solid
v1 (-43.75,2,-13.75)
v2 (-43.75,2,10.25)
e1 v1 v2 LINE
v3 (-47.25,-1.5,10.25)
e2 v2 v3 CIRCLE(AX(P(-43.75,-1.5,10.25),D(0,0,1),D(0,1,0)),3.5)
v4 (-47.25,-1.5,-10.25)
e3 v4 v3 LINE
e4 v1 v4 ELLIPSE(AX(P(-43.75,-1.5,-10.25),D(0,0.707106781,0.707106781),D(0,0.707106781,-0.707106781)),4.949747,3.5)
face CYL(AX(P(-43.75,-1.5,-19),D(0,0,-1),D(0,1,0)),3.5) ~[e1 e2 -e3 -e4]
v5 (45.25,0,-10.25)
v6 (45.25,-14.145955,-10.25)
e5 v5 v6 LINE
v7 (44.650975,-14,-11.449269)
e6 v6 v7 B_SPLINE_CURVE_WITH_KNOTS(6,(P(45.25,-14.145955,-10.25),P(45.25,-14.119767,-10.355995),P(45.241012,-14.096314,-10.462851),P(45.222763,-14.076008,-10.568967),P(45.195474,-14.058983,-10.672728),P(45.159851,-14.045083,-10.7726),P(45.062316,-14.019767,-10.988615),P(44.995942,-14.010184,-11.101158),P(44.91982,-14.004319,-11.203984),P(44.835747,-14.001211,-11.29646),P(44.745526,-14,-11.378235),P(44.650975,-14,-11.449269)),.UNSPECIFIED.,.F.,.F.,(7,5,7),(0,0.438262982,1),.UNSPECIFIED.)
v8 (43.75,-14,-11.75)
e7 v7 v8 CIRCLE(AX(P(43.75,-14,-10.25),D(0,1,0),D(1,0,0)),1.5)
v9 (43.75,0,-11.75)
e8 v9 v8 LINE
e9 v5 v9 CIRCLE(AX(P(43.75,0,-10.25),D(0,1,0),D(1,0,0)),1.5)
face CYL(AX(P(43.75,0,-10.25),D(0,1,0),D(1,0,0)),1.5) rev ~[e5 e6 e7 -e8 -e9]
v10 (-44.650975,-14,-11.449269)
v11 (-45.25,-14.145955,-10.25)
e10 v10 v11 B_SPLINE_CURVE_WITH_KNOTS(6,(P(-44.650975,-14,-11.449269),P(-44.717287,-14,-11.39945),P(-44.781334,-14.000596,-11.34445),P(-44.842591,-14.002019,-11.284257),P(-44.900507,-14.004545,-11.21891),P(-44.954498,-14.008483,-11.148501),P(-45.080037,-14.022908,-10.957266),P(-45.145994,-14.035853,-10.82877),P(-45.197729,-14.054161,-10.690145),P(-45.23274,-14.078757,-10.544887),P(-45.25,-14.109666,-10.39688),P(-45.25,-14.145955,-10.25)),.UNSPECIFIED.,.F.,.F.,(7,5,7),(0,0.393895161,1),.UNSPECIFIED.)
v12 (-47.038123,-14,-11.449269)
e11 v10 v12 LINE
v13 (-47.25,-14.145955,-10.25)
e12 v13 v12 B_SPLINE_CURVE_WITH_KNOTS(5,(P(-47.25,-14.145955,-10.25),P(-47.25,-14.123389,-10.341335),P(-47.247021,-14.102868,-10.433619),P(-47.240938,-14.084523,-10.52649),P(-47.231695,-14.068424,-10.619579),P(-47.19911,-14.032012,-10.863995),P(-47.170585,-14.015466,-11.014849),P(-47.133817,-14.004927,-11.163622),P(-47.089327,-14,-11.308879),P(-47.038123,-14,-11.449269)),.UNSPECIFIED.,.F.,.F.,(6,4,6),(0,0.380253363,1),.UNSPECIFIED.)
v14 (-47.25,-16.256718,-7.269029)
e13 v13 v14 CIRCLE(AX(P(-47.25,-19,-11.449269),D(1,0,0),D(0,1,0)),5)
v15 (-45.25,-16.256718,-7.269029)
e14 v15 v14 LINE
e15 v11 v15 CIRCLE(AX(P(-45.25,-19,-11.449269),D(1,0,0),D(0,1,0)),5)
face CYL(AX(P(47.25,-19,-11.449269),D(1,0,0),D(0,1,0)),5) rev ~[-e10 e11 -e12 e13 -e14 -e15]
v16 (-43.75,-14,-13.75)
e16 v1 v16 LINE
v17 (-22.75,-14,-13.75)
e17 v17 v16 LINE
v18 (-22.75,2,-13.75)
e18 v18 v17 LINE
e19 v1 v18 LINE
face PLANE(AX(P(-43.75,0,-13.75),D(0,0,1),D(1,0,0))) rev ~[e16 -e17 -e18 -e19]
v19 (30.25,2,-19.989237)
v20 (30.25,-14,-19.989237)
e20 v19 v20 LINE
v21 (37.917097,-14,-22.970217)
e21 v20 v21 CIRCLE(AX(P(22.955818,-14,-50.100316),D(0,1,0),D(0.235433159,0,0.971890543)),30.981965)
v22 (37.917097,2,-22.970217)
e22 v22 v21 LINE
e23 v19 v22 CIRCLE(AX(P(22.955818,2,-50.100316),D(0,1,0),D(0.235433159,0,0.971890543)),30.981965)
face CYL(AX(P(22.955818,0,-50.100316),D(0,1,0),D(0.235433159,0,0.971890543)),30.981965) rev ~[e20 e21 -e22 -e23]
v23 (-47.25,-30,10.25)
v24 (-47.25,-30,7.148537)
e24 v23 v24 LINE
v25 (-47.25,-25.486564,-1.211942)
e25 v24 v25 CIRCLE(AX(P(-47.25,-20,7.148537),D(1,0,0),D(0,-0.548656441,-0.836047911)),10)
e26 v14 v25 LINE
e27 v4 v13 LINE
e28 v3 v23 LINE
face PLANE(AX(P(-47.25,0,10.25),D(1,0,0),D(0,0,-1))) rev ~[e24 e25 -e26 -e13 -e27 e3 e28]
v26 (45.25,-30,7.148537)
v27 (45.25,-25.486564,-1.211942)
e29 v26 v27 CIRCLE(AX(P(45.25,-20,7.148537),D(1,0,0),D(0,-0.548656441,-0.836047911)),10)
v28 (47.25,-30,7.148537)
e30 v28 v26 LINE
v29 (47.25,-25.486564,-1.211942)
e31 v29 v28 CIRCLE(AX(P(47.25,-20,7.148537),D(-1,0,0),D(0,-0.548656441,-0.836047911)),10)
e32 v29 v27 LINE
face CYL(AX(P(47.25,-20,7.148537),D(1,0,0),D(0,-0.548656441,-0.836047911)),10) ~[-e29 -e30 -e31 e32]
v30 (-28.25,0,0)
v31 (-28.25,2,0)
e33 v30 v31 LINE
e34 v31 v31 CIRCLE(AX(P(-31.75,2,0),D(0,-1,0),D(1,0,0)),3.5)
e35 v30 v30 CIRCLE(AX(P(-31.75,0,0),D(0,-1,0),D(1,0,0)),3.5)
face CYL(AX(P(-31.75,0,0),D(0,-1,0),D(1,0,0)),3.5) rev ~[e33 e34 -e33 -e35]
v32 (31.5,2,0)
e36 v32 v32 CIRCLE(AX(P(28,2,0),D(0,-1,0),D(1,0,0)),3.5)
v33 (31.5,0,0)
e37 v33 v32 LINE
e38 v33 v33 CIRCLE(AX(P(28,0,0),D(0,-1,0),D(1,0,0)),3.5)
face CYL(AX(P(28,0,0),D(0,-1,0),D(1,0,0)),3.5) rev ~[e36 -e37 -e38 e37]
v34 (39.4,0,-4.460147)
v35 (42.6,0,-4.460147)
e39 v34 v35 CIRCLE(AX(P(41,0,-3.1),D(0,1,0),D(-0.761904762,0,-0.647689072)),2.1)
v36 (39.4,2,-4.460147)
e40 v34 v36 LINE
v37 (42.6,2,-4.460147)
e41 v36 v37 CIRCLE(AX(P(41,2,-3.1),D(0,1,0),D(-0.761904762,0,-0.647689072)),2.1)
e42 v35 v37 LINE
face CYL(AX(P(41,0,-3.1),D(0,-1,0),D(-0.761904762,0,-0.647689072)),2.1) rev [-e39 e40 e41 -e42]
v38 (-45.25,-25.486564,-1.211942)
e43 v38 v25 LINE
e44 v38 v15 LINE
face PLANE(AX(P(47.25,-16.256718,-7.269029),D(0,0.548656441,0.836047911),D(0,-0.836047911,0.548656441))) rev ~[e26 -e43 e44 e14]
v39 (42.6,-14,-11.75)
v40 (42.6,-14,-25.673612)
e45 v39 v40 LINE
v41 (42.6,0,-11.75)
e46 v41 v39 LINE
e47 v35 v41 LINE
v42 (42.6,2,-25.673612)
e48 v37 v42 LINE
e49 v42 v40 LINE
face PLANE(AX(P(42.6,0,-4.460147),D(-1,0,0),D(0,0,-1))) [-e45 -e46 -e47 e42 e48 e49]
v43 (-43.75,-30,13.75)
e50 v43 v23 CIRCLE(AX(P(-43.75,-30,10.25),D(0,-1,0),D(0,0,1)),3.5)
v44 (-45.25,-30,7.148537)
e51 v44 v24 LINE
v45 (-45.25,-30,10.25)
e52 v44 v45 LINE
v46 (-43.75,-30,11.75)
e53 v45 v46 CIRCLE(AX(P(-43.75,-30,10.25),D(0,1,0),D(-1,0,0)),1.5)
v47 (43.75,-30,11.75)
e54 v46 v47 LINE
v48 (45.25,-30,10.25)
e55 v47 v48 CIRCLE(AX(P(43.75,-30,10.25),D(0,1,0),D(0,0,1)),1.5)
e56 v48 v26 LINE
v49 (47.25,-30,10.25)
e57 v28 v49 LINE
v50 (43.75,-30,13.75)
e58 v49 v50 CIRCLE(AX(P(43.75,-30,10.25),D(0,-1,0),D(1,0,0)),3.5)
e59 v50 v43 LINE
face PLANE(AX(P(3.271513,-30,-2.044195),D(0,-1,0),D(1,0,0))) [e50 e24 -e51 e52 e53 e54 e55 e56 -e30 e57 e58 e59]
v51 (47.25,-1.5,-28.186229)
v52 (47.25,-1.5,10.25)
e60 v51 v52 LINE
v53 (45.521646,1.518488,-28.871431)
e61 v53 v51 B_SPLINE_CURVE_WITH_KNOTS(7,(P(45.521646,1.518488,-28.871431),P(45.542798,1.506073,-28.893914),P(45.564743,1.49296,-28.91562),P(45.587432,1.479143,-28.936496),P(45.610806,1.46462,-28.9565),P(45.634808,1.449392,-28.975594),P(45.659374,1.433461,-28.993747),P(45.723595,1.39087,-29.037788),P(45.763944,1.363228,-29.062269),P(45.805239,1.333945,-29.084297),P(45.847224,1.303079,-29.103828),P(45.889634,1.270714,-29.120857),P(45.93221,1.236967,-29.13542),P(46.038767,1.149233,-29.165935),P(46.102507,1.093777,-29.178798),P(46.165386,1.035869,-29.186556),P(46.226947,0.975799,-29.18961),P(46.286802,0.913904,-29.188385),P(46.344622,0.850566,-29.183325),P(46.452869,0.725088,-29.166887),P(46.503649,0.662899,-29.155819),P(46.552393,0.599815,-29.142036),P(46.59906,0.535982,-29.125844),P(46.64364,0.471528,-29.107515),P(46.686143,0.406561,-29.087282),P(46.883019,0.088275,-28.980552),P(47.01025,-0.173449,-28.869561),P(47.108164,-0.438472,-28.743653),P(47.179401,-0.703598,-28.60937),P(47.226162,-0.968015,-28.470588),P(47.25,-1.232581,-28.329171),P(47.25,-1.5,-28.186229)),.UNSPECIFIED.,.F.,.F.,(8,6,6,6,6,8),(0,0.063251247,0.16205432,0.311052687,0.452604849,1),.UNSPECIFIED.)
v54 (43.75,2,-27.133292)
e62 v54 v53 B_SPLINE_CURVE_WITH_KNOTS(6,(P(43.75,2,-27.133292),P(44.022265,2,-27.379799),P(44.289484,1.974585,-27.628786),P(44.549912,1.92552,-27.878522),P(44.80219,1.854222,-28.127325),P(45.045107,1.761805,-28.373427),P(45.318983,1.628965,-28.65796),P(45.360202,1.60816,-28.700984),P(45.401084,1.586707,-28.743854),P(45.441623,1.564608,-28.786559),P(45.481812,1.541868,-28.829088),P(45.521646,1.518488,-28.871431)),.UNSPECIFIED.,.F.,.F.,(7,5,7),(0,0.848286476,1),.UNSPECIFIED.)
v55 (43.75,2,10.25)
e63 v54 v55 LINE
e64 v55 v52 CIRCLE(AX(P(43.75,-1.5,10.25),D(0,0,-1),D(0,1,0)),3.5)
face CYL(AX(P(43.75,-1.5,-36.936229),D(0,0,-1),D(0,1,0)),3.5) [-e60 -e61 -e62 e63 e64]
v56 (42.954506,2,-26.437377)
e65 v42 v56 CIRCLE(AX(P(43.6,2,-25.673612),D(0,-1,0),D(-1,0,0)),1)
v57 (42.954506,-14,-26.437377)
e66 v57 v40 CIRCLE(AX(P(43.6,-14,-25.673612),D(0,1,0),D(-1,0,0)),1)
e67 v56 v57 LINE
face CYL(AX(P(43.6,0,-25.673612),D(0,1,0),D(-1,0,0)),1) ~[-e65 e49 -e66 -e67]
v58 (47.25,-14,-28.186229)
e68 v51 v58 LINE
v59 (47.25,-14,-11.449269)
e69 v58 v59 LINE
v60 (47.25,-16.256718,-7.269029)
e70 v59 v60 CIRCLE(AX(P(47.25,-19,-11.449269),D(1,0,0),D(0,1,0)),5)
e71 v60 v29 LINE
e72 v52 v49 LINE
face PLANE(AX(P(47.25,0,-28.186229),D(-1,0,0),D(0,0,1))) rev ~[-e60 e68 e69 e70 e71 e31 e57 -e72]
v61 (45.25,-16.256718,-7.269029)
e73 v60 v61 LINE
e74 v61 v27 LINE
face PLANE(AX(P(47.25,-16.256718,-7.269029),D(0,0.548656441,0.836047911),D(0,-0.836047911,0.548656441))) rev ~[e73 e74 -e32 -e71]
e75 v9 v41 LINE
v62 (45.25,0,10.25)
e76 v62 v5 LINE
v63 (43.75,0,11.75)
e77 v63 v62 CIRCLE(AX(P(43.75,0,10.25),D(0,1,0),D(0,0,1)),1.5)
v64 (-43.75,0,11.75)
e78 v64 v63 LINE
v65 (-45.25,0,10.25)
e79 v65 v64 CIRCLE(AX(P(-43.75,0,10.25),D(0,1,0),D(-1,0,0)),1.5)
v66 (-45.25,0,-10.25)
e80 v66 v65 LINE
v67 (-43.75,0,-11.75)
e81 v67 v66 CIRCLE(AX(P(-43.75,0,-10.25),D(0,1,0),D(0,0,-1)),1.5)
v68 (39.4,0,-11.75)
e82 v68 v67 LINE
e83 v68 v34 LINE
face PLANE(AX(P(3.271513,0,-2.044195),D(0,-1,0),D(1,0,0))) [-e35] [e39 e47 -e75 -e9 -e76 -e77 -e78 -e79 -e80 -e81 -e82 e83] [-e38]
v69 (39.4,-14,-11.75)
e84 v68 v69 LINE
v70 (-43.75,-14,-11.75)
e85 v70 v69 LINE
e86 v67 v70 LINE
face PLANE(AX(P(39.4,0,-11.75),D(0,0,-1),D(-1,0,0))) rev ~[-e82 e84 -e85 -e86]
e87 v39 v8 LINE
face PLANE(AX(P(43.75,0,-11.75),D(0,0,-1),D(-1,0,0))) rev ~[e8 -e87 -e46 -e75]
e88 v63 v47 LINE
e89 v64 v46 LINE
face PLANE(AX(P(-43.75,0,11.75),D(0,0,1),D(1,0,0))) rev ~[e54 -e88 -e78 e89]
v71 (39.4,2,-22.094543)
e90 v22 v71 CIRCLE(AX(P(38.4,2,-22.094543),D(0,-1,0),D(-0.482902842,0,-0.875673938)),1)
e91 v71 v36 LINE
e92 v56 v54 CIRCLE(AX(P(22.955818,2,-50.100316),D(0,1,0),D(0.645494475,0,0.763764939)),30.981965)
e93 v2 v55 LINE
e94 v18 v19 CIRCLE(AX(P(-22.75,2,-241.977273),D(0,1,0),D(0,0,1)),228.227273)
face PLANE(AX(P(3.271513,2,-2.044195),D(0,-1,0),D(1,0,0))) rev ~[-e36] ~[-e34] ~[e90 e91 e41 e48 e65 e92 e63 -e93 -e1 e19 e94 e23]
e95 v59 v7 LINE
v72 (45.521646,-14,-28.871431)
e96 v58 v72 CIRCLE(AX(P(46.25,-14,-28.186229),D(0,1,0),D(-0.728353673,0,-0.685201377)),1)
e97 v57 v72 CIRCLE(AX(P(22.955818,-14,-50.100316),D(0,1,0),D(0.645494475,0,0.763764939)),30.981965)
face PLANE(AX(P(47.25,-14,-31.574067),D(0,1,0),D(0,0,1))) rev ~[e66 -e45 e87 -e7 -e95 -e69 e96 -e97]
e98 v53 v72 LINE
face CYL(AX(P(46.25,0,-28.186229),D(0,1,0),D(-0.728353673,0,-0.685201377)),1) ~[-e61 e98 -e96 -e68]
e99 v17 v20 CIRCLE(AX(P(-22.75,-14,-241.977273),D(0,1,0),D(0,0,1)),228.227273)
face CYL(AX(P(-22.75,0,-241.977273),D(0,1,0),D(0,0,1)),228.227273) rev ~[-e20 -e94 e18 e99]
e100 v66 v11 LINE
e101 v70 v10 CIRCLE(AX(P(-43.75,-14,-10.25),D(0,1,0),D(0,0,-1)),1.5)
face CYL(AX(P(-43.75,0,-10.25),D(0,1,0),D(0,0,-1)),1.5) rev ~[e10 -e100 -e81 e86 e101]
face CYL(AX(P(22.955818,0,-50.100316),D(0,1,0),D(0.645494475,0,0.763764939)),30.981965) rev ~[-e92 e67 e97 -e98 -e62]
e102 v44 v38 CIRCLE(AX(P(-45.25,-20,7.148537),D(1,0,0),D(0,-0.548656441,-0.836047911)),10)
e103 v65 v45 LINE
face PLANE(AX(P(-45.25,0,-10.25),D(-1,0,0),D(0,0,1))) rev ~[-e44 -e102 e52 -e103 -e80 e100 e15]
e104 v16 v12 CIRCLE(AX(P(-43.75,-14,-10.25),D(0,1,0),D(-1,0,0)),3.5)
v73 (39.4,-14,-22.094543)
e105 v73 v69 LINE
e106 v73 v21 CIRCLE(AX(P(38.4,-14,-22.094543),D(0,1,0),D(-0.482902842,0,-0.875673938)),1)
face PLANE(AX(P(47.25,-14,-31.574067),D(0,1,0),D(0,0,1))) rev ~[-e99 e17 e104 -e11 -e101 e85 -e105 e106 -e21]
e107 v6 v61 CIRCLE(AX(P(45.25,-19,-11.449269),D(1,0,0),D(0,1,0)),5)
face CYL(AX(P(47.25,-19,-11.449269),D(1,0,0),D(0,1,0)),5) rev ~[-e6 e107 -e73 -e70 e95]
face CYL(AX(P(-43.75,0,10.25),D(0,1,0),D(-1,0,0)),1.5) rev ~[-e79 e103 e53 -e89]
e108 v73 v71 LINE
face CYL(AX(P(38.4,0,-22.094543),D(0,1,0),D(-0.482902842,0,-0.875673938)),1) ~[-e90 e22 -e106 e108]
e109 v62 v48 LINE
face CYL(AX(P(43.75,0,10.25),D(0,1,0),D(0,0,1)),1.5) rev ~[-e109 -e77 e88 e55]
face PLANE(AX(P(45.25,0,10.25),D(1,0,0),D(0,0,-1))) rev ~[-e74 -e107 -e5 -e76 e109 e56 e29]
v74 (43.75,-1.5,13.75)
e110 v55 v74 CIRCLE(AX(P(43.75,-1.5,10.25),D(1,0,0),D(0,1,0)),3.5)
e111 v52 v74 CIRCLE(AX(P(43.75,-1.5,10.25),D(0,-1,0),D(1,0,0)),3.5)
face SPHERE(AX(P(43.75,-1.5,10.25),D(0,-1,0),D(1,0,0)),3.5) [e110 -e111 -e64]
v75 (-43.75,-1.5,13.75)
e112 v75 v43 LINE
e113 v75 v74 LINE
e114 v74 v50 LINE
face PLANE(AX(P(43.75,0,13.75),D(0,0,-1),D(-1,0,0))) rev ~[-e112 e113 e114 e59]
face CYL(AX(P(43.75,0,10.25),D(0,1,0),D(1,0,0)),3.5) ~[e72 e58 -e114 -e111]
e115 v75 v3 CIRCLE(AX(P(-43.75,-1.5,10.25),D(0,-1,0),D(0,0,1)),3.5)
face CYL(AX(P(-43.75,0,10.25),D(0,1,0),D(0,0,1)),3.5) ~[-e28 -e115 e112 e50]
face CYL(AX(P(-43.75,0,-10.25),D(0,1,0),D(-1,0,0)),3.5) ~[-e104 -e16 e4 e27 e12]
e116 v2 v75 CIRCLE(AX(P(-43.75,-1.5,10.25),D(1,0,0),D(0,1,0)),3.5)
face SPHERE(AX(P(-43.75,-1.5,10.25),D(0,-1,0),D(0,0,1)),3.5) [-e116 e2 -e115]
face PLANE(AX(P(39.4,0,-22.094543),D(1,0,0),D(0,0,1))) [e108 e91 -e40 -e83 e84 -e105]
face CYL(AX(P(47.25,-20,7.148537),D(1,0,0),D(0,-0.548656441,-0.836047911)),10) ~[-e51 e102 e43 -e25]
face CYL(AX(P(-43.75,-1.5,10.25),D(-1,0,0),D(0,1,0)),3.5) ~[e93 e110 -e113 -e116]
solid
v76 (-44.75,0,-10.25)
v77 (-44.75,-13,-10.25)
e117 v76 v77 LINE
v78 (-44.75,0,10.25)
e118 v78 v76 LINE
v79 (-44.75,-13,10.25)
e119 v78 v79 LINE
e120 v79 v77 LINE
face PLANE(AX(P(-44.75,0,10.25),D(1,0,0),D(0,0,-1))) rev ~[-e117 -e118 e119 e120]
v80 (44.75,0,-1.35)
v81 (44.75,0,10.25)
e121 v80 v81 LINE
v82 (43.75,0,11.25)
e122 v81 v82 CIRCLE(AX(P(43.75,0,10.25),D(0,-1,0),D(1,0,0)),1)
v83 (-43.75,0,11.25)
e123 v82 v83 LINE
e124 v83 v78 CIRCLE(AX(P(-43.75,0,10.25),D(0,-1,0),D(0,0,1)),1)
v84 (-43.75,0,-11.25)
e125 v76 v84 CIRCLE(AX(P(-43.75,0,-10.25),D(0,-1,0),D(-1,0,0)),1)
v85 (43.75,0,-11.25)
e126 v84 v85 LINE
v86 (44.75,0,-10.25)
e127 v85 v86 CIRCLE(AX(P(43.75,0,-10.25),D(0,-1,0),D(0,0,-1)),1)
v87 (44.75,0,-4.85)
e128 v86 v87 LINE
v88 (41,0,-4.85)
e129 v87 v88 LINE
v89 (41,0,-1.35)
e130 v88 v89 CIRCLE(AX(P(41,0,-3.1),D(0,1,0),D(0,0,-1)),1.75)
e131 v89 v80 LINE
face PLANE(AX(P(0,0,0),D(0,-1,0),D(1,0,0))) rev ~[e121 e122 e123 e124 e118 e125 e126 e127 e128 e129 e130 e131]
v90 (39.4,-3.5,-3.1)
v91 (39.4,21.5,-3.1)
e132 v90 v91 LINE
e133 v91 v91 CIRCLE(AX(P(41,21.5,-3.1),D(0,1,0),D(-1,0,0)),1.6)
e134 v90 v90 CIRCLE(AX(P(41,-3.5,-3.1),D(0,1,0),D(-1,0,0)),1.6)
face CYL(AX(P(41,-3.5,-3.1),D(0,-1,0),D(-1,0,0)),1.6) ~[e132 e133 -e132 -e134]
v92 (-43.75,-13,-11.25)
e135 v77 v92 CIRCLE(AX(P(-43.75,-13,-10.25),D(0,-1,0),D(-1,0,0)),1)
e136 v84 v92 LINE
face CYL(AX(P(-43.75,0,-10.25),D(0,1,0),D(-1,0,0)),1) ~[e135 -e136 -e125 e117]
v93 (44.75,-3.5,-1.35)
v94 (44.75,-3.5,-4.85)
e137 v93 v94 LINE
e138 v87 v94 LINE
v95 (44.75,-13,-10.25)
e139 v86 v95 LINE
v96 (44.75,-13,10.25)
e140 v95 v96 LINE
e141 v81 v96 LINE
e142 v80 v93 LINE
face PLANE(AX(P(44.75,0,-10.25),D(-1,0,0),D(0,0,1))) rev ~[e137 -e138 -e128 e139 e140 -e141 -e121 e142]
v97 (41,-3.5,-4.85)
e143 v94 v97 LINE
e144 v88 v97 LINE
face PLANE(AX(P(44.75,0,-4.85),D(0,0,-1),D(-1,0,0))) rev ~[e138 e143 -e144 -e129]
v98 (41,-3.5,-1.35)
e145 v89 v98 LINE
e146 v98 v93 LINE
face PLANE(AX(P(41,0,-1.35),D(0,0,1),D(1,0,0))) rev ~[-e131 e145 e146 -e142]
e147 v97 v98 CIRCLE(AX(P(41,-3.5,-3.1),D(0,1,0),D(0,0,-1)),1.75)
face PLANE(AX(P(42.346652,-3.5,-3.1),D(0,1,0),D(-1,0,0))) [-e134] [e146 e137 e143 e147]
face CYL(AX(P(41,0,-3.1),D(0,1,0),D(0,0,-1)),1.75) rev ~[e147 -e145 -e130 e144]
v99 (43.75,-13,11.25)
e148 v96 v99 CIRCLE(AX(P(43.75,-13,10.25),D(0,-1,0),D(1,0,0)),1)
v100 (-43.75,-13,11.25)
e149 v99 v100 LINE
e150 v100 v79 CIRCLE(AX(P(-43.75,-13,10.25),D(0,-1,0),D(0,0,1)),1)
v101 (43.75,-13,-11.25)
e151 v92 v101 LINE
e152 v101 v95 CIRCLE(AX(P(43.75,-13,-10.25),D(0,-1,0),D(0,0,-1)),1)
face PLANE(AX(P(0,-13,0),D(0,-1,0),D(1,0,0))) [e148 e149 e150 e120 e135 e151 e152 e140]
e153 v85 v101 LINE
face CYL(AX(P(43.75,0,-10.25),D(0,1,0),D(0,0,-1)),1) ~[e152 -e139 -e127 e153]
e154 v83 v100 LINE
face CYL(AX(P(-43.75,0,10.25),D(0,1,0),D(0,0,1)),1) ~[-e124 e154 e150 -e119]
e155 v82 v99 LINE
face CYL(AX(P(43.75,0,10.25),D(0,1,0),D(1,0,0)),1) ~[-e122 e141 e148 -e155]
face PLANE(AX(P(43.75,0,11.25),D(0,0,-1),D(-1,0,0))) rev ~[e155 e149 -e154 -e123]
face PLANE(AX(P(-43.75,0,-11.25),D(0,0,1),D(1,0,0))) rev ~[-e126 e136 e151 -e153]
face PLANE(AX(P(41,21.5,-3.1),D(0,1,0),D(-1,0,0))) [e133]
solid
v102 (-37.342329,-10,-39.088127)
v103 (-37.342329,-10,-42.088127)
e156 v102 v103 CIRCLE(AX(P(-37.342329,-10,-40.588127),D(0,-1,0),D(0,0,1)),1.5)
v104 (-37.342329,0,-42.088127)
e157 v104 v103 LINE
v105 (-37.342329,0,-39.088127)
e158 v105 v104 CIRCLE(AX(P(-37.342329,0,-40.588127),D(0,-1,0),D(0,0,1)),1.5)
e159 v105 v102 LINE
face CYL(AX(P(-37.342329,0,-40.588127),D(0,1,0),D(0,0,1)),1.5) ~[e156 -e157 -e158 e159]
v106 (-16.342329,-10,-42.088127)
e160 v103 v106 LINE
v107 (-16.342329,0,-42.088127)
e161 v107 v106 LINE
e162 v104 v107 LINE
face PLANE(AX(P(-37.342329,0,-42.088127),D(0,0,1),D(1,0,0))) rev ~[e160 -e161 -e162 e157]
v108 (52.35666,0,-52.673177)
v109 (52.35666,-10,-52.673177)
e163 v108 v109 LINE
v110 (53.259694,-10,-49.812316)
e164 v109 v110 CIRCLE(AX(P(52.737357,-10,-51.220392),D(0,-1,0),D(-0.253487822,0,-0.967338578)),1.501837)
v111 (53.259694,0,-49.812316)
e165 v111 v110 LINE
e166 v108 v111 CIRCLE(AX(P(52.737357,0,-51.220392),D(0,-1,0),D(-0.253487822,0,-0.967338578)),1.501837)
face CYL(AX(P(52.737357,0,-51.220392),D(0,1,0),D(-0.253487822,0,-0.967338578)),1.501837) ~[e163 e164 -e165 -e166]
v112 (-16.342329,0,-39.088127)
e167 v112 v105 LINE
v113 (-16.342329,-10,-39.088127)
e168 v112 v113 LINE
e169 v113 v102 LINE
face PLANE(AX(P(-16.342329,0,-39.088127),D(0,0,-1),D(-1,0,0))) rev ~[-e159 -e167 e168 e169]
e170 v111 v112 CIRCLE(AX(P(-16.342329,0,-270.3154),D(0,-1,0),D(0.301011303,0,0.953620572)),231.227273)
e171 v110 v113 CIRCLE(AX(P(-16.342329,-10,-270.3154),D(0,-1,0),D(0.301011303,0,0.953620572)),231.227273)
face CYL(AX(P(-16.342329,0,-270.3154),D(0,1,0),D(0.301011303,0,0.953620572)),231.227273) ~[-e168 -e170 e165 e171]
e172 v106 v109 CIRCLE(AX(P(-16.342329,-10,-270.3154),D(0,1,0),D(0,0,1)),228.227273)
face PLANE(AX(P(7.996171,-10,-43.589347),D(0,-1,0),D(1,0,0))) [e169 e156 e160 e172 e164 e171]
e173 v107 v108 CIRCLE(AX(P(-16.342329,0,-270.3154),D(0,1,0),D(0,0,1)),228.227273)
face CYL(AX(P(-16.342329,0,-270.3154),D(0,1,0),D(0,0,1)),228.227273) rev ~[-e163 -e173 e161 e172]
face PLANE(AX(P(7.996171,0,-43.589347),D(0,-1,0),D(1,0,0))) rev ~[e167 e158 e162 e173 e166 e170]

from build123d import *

# Parameters (mm, degrees)
F1_DEPTH      = 13
F3_DEPTH      = 3.5
F4_R          = 1.6
F5_DEPTH      = 25
F6_R          = 3.5
F7_DEPTH      = 2
F8_DEPTH      = 30
F10_DEPTH     = 94.501
F12_DEPTH     = 10
F13_T1_DEPTH  = 87.5
F13_T3_DEPTH  = 47.186229439
F13_T5_DEPTH  = 29.25
F13_T8_ANGLE  = 90
F13_T10_ANGLE = 90


# Not quite as in the source:
# - a fillet or chamfer that OpenCascade refuses, or shapes differently, is made with other operations: its cross-section is extruded or revolved along the edge and cut away or added


with BuildPart() as f1:
    # F0 (on Front) → F1 (new body)
    with BuildSketch(Plane.XZ):
        with BuildLine():
            Line((-43.75, -11.25), (43.75, -11.25))
            ThreePointArc((43.75, -11.25), (44.4571067812, -10.9571067812), (44.75, -10.25))
            Line((44.75, -10.25), (44.75, 10.25))
            ThreePointArc((44.75, 10.25), (44.4571067812, 10.9571067812), (43.75, 11.25))
            Line((43.75, 11.25), (-43.75, 11.25))
            ThreePointArc((-43.75, 11.25), (-44.4571067812, 10.9571067812), (-44.75, 10.25))
            Line((-44.75, 10.25), (-44.75, -10.25))
            ThreePointArc((-44.75, -10.25), (-44.4571067812, -10.9571067812), (-43.75, -11.25))
        make_face()
    extrude(amount=F1_DEPTH)

    # F2 (on face) → F3 (cut)
    with BuildSketch(Plane(origin=(0, 0, 0), x_dir=(-1, 0, 0), z_dir=(0, 1, 0))):
        with BuildLine():
            Line((-44.75, -1.35), (-44.75, -4.85))
            Line((-44.75, -4.85), (-41, -4.85))
            ThreePointArc((-41, -4.85), (-39.25, -3.1), (-41, -1.35))
            Line((-41, -1.35), (-44.75, -1.35))
        make_face()
    extrude(amount=-F3_DEPTH, mode=Mode.SUBTRACT)

    # F4 (on face) → F5 (join)
    with BuildSketch(Plane(origin=(0, -3.5, 0), x_dir=(-1, 0, 0), z_dir=(0, 1, 0))):
        with Locations((-41, -3.1)):
            Circle(F4_R)
    extrude(amount=F5_DEPTH)


with BuildPart() as f7:
    # F6 (on Front) → F7 (new body)
    with BuildSketch(Plane.XZ):
        with BuildLine():
            ThreePointArc((43.75, 11.75), (44.8106601718, 11.3106601718), (45.25, 10.25))
            Line((45.25, 10.25), (45.25, -1.35))
            Line((45.25, -1.35), (45.25, -4.85))
            Line((45.25, -4.85), (45.25, -10.25))
            ThreePointArc((45.25, -10.25), (44.8106601718, -11.3106601718), (43.75, -11.75))
            Line((43.75, -11.75), (42.6, -11.75))
            Line((42.6, -11.75), (42.6, -25.6736123026))
            ThreePointArc((42.6, -25.6736123026), (42.6929458463, -26.0946262718), (42.9545055245, -26.4373772417))
            ThreePointArc((42.9545055245, -26.4373772417), (44.2728453868, -27.6177334706), (45.5216463266, -28.8714308156))
            ThreePointArc((45.5216463266, -28.8714308156), (46.6185419424, -29.1158405602), (47.25, -28.186229439))
            Line((47.25, -28.186229439), (47.25, -23.3814297613))
            Line((47.25, -23.3814297613), (47.25, -10.25))
            Line((47.25, -10.25), (47.25, -4.85))
            Line((47.25, -4.85), (47.25, -1.35))
            Line((47.25, -1.35), (47.25, 10.25))
            ThreePointArc((47.25, 10.25), (46.2248737342, 12.7248737342), (43.75, 13.75))
            Line((43.75, 13.75), (-43.75, 13.75))
            ThreePointArc((-43.75, 13.75), (-46.2248737342, 12.7248737342), (-47.25, 10.25))
            Line((-47.25, 10.25), (-47.25, -10.25))
            ThreePointArc((-47.25, -10.25), (-46.2248737342, -12.7248737342), (-43.75, -13.75))
            Line((-43.75, -13.75), (-22.75, -13.75))
            ThreePointArc((-22.75, -13.75), (3.9329912025, -15.3151762113), (30.25, -19.9892369764))
            ThreePointArc((30.25, -19.9892369764), (34.1829257127, -21.2241281647), (37.917097158, -22.9702165145))
            ThreePointArc((37.917097158, -22.9702165145), (38.9084767241, -22.9556183115), (39.4, -22.0945425767))
            Line((39.4, -22.0945425767), (39.4, -11.75))
            Line((39.4, -11.75), (-43.75, -11.75))
            ThreePointArc((-43.75, -11.75), (-44.8106601718, -11.3106601718), (-45.25, -10.25))
            Line((-45.25, -10.25), (-45.25, 10.25))
            ThreePointArc((-45.25, 10.25), (-44.8106601718, 11.3106601718), (-43.75, 11.75))
            Line((-43.75, 11.75), (43.75, 11.75))
        make_face()
        with BuildLine():
            Line((45.25, -1.35), (45.25, 10.25))
            ThreePointArc((45.25, 10.25), (44.8106601718, 11.3106601718), (43.75, 11.75))
            Line((43.75, 11.75), (-43.75, 11.75))
            ThreePointArc((-43.75, 11.75), (-44.8106601718, 11.3106601718), (-45.25, 10.25))
            Line((-45.25, 10.25), (-45.25, -10.25))
            ThreePointArc((-45.25, -10.25), (-44.8106601718, -11.3106601718), (-43.75, -11.75))
            Line((-43.75, -11.75), (39.4, -11.75))
            Line((39.4, -11.75), (39.4, -4.4601470509))
            ThreePointArc((39.4, -4.4601470509), (41, -1), (42.6, -4.4601470509))
            Line((42.6, -4.4601470509), (42.6, -11.75))
            Line((42.6, -11.75), (43.75, -11.75))
            ThreePointArc((43.75, -11.75), (44.8106601718, -11.3106601718), (45.25, -10.25))
            Line((45.25, -10.25), (45.25, -4.85))
            Line((45.25, -4.85), (45.25, -1.35))
        make_face()
        with Locations((-31.75, 0)):
            Circle(F6_R, mode=Mode.SUBTRACT)
        with Locations((28, 0)):
            Circle(F6_R, mode=Mode.SUBTRACT)
    extrude(amount=-F7_DEPTH)

    # F6 (on Front) → F8 (join)
    with BuildSketch(Plane.XZ):
        with BuildLine():
            ThreePointArc((43.75, 11.75), (44.8106601718, 11.3106601718), (45.25, 10.25))
            Line((45.25, 10.25), (45.25, -1.35))
            Line((45.25, -1.35), (45.25, -4.85))
            Line((45.25, -4.85), (45.25, -10.25))
            ThreePointArc((45.25, -10.25), (44.8106601718, -11.3106601718), (43.75, -11.75))
            Line((43.75, -11.75), (42.6, -11.75))
            Line((42.6, -11.75), (42.6, -25.6736123026))
            ThreePointArc((42.6, -25.6736123026), (42.6929458463, -26.0946262718), (42.9545055245, -26.4373772417))
            ThreePointArc((42.9545055245, -26.4373772417), (44.2728453868, -27.6177334706), (45.5216463266, -28.8714308156))
            ThreePointArc((45.5216463266, -28.8714308156), (46.6185419424, -29.1158405602), (47.25, -28.186229439))
            Line((47.25, -28.186229439), (47.25, -23.3814297613))
            Line((47.25, -23.3814297613), (47.25, -10.25))
            Line((47.25, -10.25), (47.25, -4.85))
            Line((47.25, -4.85), (47.25, -1.35))
            Line((47.25, -1.35), (47.25, 10.25))
            ThreePointArc((47.25, 10.25), (46.2248737342, 12.7248737342), (43.75, 13.75))
            Line((43.75, 13.75), (-43.75, 13.75))
            ThreePointArc((-43.75, 13.75), (-46.2248737342, 12.7248737342), (-47.25, 10.25))
            Line((-47.25, 10.25), (-47.25, -10.25))
            ThreePointArc((-47.25, -10.25), (-46.2248737342, -12.7248737342), (-43.75, -13.75))
            Line((-43.75, -13.75), (-22.75, -13.75))
            ThreePointArc((-22.75, -13.75), (3.9329912025, -15.3151762113), (30.25, -19.9892369764))
            ThreePointArc((30.25, -19.9892369764), (34.1829257127, -21.2241281647), (37.917097158, -22.9702165145))
            ThreePointArc((37.917097158, -22.9702165145), (38.9084767241, -22.9556183115), (39.4, -22.0945425767))
            Line((39.4, -22.0945425767), (39.4, -11.75))
            Line((39.4, -11.75), (-43.75, -11.75))
            ThreePointArc((-43.75, -11.75), (-44.8106601718, -11.3106601718), (-45.25, -10.25))
            Line((-45.25, -10.25), (-45.25, 10.25))
            ThreePointArc((-45.25, 10.25), (-44.8106601718, 11.3106601718), (-43.75, 11.75))
            Line((-43.75, 11.75), (43.75, 11.75))
        make_face()
    extrude(amount=F8_DEPTH)

    # F9 (on face) → F10 (cut, through all)
    with BuildSketch(Plane.YZ.offset(47.25)):
        with BuildLine():
            Line((-30, -28.186229439), (-14, -28.186229439))
            Line((-14, -28.186229439), (-14, -11.4492685028))
            ThreePointArc((-14, -11.4492685028), (-14.6002039231, -9.074022309), (-16.2567177926, -7.2690289486))
            Line((-16.2567177926, -7.2690289486), (-25.4865644149, -1.2119421027))
            ThreePointArc((-25.4865644149, -1.2119421027), (-28.7995921539, 2.3980446179), (-30, 7.1485370056))
            Line((-30, 7.1485370056), (-30, -28.186229439))
        make_face()
        Polygon((-34.3077805638, -31.5740667284), (-14, -31.5740667284), (-14, -28.186229439), (-30, -28.186229439), (-30, 7.1485370056), (-30, 10.25), (-30, 16.696613282), (-34.3077805638, 16.696613282), align=None)
    extrude(amount=-F10_DEPTH, mode=Mode.SUBTRACT)

    # F13: fillet of radius 3.5 on 5 edges, made by hand

    # F13_s2 → F13_t1 (cut)
    with BuildSketch(Plane.YZ.offset(-43.75)):
        with BuildLine():
            ThreePointArc((2, 10.25), (0.9748737342, 12.7248737342), (-1.5, 13.75))
            Line((-1.5, 13.75), (2, 13.75))
            Line((2, 13.75), (2, 10.25))
        make_face()
    extrude(amount=F13_T1_DEPTH, mode=Mode.SUBTRACT)

    # F13_s4 → F13_t3 (cut)
    with BuildSketch(Plane.XY.offset(-36.936229439)):
        with BuildLine():
            ThreePointArc((43.75, 2), (46.2248737342, 0.9748737342), (47.25, -1.5))
            Line((47.25, -1.5), (47.25, 2))
            Line((47.25, 2), (43.75, 2))
        make_face()
    extrude(amount=F13_T3_DEPTH, mode=Mode.SUBTRACT)

    # F13_s6 → F13_t5 (cut)
    with BuildSketch(Plane.XY.offset(-19)):
        with BuildLine():
            ThreePointArc((-43.75, 2), (-46.2248737342, 0.9748737342), (-47.25, -1.5))
            Line((-47.25, -1.5), (-47.25, 2))
            Line((-47.25, 2), (-43.75, 2))
        make_face()
    extrude(amount=F13_T5_DEPTH, mode=Mode.SUBTRACT)

    # F13_s7 → F13_t8 (revolve, cut)
    with BuildSketch(Plane.XY.offset(10.25)):
        with BuildLine():
            ThreePointArc((43.75, 2), (46.2248737342, 0.9748737342), (47.25, -1.5))
            Line((47.25, -1.5), (47.25, 2))
            Line((47.25, 2), (43.75, 2))
        make_face()
    revolve(axis=Axis((43.75, 2, 10.25), (0, -1, 0)), revolution_arc=F13_T8_ANGLE, mode=Mode.SUBTRACT)

    # F13_s9 → F13_t10 (revolve, cut)
    with BuildSketch(Plane.YZ.offset(-43.75)):
        with BuildLine():
            ThreePointArc((2, 10.25), (0.9748737342, 12.7248737342), (-1.5, 13.75))
            Line((-1.5, 13.75), (2, 13.75))
            Line((2, 13.75), (2, 10.25))
        make_face()
    revolve(axis=Axis((-43.75, 2, 10.25), (0, -1, 0)), revolution_arc=F13_T10_ANGLE, mode=Mode.SUBTRACT)


with BuildPart() as f12:
    # F11 (on Front) → F12 (new body)
    with BuildSketch(Plane.XZ):
        with BuildLine():
            Line((-37.3423290549, -42.0881269919), (-16.3423290549, -42.0881269919))
            ThreePointArc((-16.3423290549, -42.0881269919), (18.412506359, -44.7499115968), (52.3566596423, -52.6731773254))
            ThreePointArc((52.3566596423, -52.6731773254), (54.169539989, -51.6724622056), (53.2596935507, -49.812315609))
            ThreePointArc((53.2596935507, -49.812315609), (18.8693514371, -41.7849002014), (-16.3423290549, -39.0881269919))
            Line((-16.3423290549, -39.0881269919), (-37.3423290549, -39.0881269919))
            ThreePointArc((-37.3423290549, -39.0881269919), (-38.8423290549, -40.5881269919), (-37.3423290549, -42.0881269919))
        make_face()
    extrude(amount=F12_DEPTH)


solid = Compound([f1.part, f7.part, f12.part])
